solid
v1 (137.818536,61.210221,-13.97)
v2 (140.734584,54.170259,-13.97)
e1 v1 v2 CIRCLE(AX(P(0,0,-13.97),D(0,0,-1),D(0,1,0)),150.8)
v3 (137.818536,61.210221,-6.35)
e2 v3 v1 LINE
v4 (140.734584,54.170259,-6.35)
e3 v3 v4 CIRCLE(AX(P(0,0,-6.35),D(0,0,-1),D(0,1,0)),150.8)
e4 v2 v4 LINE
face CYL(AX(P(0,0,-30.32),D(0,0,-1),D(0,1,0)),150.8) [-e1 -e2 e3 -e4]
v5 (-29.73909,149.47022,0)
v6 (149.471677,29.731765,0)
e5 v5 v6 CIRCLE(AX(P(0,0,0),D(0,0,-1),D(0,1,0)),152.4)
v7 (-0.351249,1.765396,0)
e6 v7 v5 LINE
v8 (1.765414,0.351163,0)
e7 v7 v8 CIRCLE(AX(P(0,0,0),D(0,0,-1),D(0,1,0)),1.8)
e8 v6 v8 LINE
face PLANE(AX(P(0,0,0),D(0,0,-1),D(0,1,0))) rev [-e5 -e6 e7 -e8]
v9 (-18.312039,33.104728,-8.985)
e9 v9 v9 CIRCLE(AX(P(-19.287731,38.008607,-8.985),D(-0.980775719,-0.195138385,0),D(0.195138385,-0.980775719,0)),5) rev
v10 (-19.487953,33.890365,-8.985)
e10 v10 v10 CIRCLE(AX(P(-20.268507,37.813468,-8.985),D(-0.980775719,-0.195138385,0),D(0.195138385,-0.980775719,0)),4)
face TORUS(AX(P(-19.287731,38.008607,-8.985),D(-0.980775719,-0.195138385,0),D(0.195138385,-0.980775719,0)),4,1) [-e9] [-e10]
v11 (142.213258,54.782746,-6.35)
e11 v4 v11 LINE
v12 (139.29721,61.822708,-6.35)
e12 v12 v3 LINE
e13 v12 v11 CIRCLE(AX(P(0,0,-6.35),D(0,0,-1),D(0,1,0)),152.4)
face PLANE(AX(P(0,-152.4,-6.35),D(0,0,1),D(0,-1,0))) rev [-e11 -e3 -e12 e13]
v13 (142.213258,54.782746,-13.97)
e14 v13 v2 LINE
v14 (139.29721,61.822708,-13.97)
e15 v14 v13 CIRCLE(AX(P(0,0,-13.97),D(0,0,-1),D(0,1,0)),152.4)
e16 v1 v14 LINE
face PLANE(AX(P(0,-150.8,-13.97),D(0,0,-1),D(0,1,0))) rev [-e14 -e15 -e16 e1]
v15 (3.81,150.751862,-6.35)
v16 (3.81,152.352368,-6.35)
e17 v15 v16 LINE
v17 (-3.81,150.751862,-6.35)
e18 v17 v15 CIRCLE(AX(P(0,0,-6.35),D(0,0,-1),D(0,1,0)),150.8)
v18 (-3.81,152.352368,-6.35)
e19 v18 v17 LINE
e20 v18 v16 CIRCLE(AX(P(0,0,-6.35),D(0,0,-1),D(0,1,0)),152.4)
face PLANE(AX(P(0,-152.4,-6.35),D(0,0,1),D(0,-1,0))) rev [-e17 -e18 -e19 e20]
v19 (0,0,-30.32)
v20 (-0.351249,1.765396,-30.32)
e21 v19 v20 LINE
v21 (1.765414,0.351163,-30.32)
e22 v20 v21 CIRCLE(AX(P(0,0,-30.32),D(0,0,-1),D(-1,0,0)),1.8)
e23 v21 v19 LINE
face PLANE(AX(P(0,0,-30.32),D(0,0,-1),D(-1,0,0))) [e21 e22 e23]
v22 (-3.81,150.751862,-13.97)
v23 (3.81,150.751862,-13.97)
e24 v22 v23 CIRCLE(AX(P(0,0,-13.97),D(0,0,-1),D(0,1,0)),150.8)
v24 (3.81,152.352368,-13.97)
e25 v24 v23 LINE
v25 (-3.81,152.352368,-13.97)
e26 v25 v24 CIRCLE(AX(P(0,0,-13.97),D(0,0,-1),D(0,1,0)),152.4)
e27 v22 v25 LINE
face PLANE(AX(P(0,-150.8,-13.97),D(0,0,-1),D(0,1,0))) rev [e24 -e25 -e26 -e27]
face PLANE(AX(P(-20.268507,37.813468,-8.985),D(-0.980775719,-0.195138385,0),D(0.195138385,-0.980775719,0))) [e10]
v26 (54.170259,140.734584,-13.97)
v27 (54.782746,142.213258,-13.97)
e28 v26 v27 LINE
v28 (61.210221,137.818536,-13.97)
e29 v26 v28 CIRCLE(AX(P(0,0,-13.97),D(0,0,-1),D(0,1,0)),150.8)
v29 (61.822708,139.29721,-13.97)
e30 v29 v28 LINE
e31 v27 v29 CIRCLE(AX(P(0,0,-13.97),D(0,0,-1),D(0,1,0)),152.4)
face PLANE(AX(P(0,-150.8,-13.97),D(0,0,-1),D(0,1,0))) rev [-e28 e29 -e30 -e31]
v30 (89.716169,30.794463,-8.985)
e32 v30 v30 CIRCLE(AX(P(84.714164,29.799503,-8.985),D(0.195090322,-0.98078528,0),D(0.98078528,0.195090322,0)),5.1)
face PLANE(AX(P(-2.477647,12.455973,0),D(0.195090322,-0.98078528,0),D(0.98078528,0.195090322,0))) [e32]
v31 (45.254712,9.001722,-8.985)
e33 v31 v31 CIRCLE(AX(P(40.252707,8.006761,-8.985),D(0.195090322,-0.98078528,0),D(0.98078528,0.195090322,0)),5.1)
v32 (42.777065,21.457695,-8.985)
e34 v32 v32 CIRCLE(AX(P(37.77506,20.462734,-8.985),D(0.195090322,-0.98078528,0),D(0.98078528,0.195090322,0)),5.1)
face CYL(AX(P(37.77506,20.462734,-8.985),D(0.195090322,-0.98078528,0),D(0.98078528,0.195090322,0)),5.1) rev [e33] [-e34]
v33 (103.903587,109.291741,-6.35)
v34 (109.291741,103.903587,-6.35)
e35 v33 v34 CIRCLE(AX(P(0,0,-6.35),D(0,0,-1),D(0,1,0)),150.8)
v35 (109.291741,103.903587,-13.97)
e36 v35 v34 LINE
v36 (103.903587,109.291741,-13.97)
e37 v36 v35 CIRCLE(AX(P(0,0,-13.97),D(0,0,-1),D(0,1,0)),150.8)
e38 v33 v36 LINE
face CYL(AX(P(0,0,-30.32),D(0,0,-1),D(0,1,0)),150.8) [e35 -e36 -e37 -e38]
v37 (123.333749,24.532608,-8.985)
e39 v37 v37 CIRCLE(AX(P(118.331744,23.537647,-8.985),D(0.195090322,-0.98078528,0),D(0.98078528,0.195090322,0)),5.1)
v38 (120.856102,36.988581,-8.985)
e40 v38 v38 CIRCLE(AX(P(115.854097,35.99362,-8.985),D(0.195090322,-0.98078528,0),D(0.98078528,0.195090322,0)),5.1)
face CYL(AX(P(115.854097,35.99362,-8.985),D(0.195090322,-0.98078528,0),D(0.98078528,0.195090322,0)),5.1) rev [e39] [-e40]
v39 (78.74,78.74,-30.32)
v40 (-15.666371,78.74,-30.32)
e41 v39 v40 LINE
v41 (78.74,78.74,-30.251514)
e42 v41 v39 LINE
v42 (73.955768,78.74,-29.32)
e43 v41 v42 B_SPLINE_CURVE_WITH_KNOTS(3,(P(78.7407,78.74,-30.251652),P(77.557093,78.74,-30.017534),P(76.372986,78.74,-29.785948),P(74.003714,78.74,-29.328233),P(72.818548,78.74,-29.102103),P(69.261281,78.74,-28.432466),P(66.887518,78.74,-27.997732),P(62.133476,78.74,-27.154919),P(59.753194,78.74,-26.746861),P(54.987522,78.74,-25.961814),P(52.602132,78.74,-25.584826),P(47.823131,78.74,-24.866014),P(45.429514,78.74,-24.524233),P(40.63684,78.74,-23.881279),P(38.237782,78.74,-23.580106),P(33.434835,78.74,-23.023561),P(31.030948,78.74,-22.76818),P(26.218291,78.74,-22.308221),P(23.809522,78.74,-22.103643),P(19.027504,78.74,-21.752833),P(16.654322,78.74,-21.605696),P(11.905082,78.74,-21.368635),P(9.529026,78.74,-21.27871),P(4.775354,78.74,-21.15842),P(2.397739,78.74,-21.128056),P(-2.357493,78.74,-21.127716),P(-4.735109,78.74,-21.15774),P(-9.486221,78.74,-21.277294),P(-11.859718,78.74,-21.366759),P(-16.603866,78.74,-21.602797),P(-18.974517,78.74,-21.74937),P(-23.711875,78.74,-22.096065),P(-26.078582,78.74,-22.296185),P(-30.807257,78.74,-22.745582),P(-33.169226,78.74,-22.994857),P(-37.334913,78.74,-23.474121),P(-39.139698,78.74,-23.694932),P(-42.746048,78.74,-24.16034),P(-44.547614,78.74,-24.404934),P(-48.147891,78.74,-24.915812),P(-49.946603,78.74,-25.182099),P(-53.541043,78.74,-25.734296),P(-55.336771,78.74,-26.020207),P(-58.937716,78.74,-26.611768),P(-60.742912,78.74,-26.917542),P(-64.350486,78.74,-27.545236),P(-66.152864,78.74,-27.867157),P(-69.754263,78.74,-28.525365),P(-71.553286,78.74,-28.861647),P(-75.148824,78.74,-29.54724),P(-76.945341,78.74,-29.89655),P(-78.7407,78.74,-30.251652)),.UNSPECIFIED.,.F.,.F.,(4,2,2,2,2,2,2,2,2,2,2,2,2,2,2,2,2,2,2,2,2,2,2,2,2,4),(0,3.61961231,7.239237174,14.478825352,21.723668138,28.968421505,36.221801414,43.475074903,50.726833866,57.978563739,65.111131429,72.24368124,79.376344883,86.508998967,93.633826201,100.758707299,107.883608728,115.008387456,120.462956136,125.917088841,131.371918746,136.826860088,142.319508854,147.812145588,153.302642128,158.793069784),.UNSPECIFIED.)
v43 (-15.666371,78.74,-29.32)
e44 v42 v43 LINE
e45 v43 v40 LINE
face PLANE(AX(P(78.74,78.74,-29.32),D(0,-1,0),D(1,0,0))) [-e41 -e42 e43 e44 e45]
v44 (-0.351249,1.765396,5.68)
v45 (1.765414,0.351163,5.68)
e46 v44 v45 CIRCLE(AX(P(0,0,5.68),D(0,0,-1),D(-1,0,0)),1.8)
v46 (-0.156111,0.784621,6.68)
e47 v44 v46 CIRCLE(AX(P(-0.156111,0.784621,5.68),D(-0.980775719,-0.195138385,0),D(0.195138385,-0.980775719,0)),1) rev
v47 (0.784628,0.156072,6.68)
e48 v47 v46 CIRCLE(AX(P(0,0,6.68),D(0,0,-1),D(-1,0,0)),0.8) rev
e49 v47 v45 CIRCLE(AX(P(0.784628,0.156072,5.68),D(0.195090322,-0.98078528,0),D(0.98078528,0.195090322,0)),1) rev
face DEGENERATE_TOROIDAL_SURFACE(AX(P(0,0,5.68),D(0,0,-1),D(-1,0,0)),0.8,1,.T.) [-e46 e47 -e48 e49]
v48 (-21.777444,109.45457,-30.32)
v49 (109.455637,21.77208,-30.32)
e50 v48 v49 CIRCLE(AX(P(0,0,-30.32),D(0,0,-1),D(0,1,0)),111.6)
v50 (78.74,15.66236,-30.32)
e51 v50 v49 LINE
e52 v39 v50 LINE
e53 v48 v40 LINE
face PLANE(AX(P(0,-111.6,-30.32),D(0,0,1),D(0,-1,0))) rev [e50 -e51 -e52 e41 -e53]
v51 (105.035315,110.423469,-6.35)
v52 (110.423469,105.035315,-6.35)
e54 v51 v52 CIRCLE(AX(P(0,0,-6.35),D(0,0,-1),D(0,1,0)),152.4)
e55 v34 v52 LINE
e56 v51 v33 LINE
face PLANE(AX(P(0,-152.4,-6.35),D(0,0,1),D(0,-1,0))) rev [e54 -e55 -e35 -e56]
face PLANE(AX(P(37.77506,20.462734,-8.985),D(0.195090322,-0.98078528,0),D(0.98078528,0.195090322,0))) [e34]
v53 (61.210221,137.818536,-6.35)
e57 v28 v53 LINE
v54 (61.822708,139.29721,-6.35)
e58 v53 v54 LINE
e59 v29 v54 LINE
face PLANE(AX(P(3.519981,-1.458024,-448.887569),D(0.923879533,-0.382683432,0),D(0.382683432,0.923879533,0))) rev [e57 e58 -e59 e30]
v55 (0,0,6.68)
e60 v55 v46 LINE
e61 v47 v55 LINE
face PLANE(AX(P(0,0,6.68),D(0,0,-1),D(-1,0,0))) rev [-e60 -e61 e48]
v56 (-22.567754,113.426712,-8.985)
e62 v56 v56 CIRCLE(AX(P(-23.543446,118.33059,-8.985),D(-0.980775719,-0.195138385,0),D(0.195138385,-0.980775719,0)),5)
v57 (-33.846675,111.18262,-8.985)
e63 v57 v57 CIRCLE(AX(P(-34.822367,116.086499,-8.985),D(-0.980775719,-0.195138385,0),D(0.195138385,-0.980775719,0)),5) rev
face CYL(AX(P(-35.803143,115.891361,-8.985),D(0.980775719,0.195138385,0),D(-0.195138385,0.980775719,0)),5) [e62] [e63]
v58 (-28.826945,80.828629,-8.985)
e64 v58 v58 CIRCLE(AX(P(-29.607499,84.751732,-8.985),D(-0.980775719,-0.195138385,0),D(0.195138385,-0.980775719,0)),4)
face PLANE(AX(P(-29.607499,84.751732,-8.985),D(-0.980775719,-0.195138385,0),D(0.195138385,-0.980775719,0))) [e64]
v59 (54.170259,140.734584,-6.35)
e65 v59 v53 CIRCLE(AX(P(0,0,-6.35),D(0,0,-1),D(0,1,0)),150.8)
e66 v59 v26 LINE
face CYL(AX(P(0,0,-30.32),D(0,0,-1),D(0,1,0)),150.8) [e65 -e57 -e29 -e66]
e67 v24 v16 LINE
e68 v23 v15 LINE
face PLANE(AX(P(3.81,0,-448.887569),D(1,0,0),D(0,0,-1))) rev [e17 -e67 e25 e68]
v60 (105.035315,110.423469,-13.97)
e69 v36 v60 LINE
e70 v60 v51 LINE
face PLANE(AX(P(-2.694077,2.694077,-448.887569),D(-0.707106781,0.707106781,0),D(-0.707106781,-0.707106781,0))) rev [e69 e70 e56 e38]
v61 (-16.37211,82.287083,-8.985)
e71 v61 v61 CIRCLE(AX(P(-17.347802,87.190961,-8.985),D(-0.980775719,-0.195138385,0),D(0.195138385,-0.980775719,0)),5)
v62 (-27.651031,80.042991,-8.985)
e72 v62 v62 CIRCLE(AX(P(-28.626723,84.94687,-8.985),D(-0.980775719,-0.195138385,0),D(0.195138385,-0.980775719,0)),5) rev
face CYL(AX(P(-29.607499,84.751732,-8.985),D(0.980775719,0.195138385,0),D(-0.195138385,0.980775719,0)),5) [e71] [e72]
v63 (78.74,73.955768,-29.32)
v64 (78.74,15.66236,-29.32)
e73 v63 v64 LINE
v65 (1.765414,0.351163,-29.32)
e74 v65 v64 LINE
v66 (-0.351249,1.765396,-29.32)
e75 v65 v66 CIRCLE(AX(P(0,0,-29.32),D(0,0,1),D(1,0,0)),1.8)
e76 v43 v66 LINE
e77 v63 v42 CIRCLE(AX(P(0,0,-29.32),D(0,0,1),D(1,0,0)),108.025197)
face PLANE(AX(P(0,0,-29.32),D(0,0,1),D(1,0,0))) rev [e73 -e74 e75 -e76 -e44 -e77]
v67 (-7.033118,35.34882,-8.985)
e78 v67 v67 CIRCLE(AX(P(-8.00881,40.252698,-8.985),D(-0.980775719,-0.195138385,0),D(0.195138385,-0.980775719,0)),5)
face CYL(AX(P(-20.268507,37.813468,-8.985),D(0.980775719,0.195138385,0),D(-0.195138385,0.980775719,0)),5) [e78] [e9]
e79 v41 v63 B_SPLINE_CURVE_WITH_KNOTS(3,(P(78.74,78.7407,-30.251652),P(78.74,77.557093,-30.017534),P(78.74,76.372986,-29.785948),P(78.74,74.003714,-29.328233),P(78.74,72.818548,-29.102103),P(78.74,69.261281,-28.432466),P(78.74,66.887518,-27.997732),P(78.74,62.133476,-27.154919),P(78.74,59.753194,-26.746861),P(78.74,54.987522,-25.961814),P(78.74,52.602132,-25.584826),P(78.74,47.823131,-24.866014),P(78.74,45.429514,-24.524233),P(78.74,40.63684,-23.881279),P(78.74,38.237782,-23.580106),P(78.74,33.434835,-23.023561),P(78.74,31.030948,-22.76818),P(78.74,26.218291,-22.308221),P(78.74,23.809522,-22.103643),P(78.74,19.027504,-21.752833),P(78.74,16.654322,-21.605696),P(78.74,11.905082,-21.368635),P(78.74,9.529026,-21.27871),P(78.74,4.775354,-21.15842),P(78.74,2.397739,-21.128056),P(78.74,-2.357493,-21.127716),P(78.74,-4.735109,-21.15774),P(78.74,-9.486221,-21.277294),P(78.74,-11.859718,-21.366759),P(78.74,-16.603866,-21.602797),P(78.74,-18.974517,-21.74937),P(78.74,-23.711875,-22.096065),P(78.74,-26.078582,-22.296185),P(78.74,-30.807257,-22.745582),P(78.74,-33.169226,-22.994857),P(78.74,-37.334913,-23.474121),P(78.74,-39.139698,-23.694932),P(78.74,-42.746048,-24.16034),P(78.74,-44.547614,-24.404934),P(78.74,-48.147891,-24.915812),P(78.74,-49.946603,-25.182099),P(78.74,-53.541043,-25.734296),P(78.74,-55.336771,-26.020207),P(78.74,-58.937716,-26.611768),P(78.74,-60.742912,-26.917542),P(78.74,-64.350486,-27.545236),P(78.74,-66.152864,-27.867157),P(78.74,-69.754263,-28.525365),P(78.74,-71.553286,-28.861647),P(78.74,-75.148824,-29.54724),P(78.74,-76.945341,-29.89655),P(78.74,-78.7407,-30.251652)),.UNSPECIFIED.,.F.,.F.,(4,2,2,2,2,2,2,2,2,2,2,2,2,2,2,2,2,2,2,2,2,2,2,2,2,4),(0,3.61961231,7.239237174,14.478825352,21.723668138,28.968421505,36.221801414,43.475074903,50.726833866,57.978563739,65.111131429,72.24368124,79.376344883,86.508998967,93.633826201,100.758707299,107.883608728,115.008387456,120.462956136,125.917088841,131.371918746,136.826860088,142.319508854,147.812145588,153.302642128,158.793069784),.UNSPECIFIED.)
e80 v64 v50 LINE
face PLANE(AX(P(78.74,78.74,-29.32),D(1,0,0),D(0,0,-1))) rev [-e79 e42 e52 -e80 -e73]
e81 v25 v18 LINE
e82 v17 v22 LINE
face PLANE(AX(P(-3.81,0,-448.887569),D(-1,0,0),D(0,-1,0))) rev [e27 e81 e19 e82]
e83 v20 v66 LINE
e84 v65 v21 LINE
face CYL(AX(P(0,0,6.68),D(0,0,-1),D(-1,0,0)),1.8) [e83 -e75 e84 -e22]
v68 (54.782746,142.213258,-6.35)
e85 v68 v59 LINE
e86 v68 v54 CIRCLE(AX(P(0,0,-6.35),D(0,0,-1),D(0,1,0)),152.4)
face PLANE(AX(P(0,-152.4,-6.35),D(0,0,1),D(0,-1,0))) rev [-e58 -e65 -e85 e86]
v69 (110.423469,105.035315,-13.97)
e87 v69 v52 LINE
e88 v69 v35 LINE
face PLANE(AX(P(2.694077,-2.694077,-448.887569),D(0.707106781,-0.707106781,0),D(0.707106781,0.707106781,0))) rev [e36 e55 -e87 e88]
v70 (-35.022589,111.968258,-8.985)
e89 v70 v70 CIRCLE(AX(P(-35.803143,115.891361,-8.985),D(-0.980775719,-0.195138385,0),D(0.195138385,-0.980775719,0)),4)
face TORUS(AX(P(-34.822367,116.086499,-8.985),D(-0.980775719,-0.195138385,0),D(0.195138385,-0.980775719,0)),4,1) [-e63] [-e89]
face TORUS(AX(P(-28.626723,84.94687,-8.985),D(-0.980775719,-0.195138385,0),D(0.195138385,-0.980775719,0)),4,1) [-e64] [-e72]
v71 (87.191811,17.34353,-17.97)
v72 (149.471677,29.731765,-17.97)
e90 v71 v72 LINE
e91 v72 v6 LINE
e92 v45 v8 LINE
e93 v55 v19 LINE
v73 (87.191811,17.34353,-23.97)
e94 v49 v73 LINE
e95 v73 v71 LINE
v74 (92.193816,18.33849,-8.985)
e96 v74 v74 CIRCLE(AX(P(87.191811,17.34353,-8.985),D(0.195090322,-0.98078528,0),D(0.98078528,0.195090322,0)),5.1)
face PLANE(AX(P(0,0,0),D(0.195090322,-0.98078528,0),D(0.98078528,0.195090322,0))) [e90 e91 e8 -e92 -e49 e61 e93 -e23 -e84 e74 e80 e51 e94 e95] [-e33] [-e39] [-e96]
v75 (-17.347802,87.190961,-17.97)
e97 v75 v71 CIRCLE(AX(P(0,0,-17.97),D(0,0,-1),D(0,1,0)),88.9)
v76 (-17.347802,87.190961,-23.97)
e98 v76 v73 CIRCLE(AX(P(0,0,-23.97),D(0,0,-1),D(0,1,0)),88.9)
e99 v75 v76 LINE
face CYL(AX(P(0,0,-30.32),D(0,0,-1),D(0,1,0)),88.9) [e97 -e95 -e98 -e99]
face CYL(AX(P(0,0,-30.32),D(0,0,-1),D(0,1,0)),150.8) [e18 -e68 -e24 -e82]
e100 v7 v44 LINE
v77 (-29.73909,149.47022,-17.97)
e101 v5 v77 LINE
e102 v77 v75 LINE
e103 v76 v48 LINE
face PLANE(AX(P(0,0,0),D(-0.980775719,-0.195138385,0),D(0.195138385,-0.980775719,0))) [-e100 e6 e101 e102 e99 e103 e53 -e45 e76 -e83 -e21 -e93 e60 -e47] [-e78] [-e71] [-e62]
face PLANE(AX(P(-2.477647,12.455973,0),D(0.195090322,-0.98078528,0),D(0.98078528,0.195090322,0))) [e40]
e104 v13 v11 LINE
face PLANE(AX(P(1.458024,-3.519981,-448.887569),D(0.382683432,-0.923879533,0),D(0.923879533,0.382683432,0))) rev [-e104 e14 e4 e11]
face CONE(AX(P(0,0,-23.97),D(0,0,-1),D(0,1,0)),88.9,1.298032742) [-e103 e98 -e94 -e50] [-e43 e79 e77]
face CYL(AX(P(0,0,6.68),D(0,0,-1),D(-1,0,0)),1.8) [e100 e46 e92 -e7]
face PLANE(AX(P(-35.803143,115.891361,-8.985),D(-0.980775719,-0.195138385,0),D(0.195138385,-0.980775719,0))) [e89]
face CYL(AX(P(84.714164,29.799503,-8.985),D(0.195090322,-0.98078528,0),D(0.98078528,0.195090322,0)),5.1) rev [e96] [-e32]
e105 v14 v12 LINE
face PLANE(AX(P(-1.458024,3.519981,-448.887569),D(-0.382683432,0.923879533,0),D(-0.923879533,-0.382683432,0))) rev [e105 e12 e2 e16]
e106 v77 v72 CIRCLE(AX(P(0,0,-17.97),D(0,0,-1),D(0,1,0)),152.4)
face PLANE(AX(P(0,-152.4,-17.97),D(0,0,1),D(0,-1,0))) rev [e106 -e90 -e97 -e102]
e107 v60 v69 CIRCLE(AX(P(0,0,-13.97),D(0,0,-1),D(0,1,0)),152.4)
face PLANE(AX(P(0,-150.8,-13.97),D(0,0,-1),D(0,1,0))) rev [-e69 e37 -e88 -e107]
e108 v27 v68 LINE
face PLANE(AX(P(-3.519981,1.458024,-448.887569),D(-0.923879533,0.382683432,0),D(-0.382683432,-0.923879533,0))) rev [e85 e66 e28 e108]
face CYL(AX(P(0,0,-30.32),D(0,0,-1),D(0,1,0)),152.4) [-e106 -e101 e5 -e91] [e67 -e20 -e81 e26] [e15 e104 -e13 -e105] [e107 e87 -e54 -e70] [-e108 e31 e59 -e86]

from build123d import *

# Parameters (mm, degrees)
BOSS_EXTRUDE1_START = -13.97
BOSS_EXTRUDE1_DEPTH = 7.62
SKETCH3_W           = 157.48
SKETCH3_H           = 157.48
CUT_EXTRUDE1_DEPTH  = 1
SKETCH3_3_R         = 1.8
BOSS_EXTRUDE2_DEPTH = 37
FILLET1_R           = 1
SKETCH11_R          = 5.1
CUT_EXTRUDE2_DEPTH  = 12.7
SKETCH10_R          = 5
BOSS_EXTRUDE3_DEPTH = 12.5
FILLET2_R           = 1


# Read off the part's stored shape, not the designer's step: Boss-Extrude1
with BuildPart() as part:
    # Sketch1 → Revolve1 (revolve)
    with BuildSketch(Plane.YZ, mode=Mode.PRIVATE) as revolve1_sk:
        Polygon((0, 0), (-152.4, 0), (-152.4, -6.35), (-150.8, -6.35), (-150.8, -13.97), (-152.4, -13.97), (-152.4, -17.97), (-88.9, -17.97), (-88.9, -23.97), (-111.6, -30.32), (0, -30.32), align=None)
    revolve(revolve1_sk.sketch.rotate(Axis((0, 0, -30.32), (0, 0, 1)), 180), axis=Axis((0, 0, -30.32), (0, 0, 1)))

    # Boss-Extrude1 outline → Boss-Extrude1 (add)
    with BuildSketch(Plane.XY.offset(BOSS_EXTRUDE1_START)):
        with BuildLine():
            Line((150.751862012, 3.81), (152.352367556, 3.81))
            ThreePointArc((152.352367556, 3.81), (149.471676733, 29.731765076), (142.213257992, 54.782745927))
            Line((142.213257992, 54.782745927), (140.734583678, 54.170258971))
            ThreePointArc((140.734583678, 54.170258971), (147.902420285, 29.41962056), (150.751862012, 3.81))
        make_face()
        with BuildLine():
            ThreePointArc((142.213257992, -54.782745926), (149.471676733, -29.731765075), (152.352367556, -3.81))
            Line((152.352367556, -3.81), (150.751862012, -3.81))
            ThreePointArc((150.751862012, -3.81), (147.902420285, -29.41962056), (140.734583678, -54.170258971))
            Line((140.734583678, -54.170258971), (142.213257992, -54.782745926))
        make_face()
        with BuildLine():
            Line((137.818535923, 61.210221009), (139.297210238, 61.822707964))
            ThreePointArc((139.297210238, 61.822707964), (126.715968915, 84.668903512), (110.423469065, 105.035315393))
            Line((110.423469065, 105.035315393), (109.291740741, 103.903587069))
            ThreePointArc((109.291740741, 103.903587069), (125.385617535, 83.77999114), (137.818535923, 61.210221009))
        make_face()
        with BuildLine():
            ThreePointArc((110.423469065, -105.035315392), (126.715968915, -84.668903512), (139.297210238, -61.822707964))
            Line((139.297210238, -61.822707964), (137.818535923, -61.210221009))
            ThreePointArc((137.818535923, -61.210221009), (125.385617535, -83.77999114), (109.291740741, -103.903587069))
            Line((109.291740741, -103.903587069), (110.423469065, -105.035315392))
        make_face()
        with BuildLine():
            Line((103.903587069, 109.291740741), (105.035315393, 110.423469065))
            ThreePointArc((105.035315393, 110.423469065), (84.668903512, 126.715968915), (61.822707964, 139.297210238))
            Line((61.822707964, 139.297210238), (61.210221009, 137.818535923))
            ThreePointArc((61.210221009, 137.818535923), (83.77999114, 125.385617535), (103.903587069, 109.291740741))
        make_face()
        with BuildLine():
            ThreePointArc((61.822707964, -139.297210238), (84.668903512, -126.715968915), (105.035315393, -110.423469065))
            Line((105.035315393, -110.423469065), (103.903587069, -109.291740741))
            ThreePointArc((103.903587069, -109.291740741), (83.77999114, -125.385617535), (61.210221009, -137.818535923))
            Line((61.210221009, -137.818535923), (61.822707964, -139.297210238))
        make_face()
        with BuildLine():
            Line((54.170258971, 140.734583678), (54.782745927, 142.213257992))
            ThreePointArc((54.782745927, 142.213257992), (29.731765076, 149.471676733), (3.81, 152.352367556))
            Line((3.81, 152.352367556), (3.81, 150.751862012))
            ThreePointArc((3.81, 150.751862012), (29.41962056, 147.902420285), (54.170258971, 140.734583678))
        make_face()
        with BuildLine():
            ThreePointArc((3.81, -152.352367556), (29.731765076, -149.471676733), (54.782745927, -142.213257992))
            Line((54.782745927, -142.213257992), (54.170258971, -140.734583678))
            ThreePointArc((54.170258971, -140.734583678), (29.41962056, -147.902420285), (3.81, -150.751862012))
            Line((3.81, -150.751862012), (3.81, -152.352367556))
        make_face()
        with BuildLine():
            Line((-3.81, 150.751862012), (-3.81, 152.352367556))
            ThreePointArc((-3.81, 152.352367556), (-29.731765076, 149.471676733), (-54.782745927, 142.213257992))
            Line((-54.782745927, 142.213257992), (-54.170258971, 140.734583678))
            ThreePointArc((-54.170258971, 140.734583678), (-29.41962056, 147.902420285), (-3.81, 150.751862012))
        make_face()
        with BuildLine():
            ThreePointArc((-54.782745926, -142.213257992), (-29.731765075, -149.471676733), (-3.81, -152.352367556))
            Line((-3.81, -152.352367556), (-3.81, -150.751862012))
            ThreePointArc((-3.81, -150.751862012), (-29.41962056, -147.902420285), (-54.170258971, -140.734583678))
            Line((-54.170258971, -140.734583678), (-54.782745926, -142.213257992))
        make_face()
        with BuildLine():
            Line((-61.210221009, 137.818535923), (-61.822707964, 139.297210238))
            ThreePointArc((-61.822707964, 139.297210238), (-84.668903512, 126.715968915), (-105.035315393, 110.423469065))
            Line((-105.035315393, 110.423469065), (-103.903587069, 109.291740741))
            ThreePointArc((-103.903587069, 109.291740741), (-83.77999114, 125.385617535), (-61.210221009, 137.818535923))
        make_face()
        with BuildLine():
            ThreePointArc((-105.035315392, -110.423469065), (-84.668903512, -126.715968915), (-61.822707964, -139.297210238))
            Line((-61.822707964, -139.297210238), (-61.210221009, -137.818535923))
            ThreePointArc((-61.210221009, -137.818535923), (-83.77999114, -125.385617535), (-103.903587069, -109.291740741))
            Line((-103.903587069, -109.291740741), (-105.035315392, -110.423469065))
        make_face()
        with BuildLine():
            Line((-109.291740741, 103.903587069), (-110.423469065, 105.035315393))
            ThreePointArc((-110.423469065, 105.035315393), (-126.715968915, 84.668903512), (-139.297210238, 61.822707964))
            Line((-139.297210238, 61.822707964), (-137.818535923, 61.210221009))
            ThreePointArc((-137.818535923, 61.210221009), (-125.385617535, 83.77999114), (-109.291740741, 103.903587069))
        make_face()
        with BuildLine():
            ThreePointArc((-139.297210238, -61.822707964), (-126.715968915, -84.668903512), (-110.423469065, -105.035315393))
            Line((-110.423469065, -105.035315393), (-109.291740741, -103.903587069))
            ThreePointArc((-109.291740741, -103.903587069), (-125.385617535, -83.77999114), (-137.818535923, -61.210221009))
            Line((-137.818535923, -61.210221009), (-139.297210238, -61.822707964))
        make_face()
        with BuildLine():
            Line((-140.734583678, 54.170258971), (-142.213257992, 54.782745926))
            ThreePointArc((-142.213257992, 54.782745926), (-149.471676733, 29.731765075), (-152.352367556, 3.81))
            Line((-152.352367556, 3.81), (-150.751862012, 3.81))
            ThreePointArc((-150.751862012, 3.81), (-147.902420285, 29.41962056), (-140.734583678, 54.170258971))
        make_face()
        with BuildLine():
            ThreePointArc((-152.352367556, -3.81), (-149.471676733, -29.731765076), (-142.213257992, -54.782745927))
            Line((-142.213257992, -54.782745927), (-140.734583678, -54.170258971))
            ThreePointArc((-140.734583678, -54.170258971), (-147.902420285, -29.41962056), (-150.751862012, -3.81))
            Line((-150.751862012, -3.81), (-152.352367556, -3.81))
        make_face()
    extrude(amount=BOSS_EXTRUDE1_DEPTH)

    # Sketch3 → Cut-Extrude1 (cut)
    with BuildSketch(Plane(origin=(0, 0, -30.32), x_dir=(1, 0, 0), z_dir=(0, 0, -1))):
        Rectangle(SKETCH3_W, SKETCH3_H)
    extrude(amount=-CUT_EXTRUDE1_DEPTH, mode=Mode.SUBTRACT)

    # Sketch3<3> → Boss-Extrude2 (add)
    with BuildSketch(Plane(origin=(0, 0, -30.32), x_dir=(1, 0, 0), z_dir=(0, 0, -1))):
        with Locations(Location((0, 0, 0), (0, 0, 180))):
            Circle(SKETCH3_3_R)
    extrude(amount=-BOSS_EXTRUDE2_DEPTH)

    # Fillet1
    fillet1_edges = [part.edges().sort_by_distance(p)[0] for p in [
        (1.8, 0, 6.68),
    ]]
    fillet(fillet1_edges, radius=FILLET1_R)

    # Split2
    split(bisect_by=Plane(origin=(0, 0, 0), x_dir=(-0.9807852804032318, -0.19509032201612173, 0), z_dir=(0.19509032201612173, -0.9807852804032318, 0)), keep=Keep.BOTTOM)

    # Split3
    split(bisect_by=Plane(origin=(0, 0, 0), x_dir=(0.1951383847238072, -0.9807757189120169, 0), z_dir=(-0.9807757189120169, -0.1951383847238072, 0)), keep=Keep.BOTTOM)

    # Sketch11 → Cut-Extrude2 (cut)
    with BuildSketch(Plane(origin=(0, 0, 0), x_dir=(0.9807852804032318, 0.19509032201612175, 0), z_dir=(0.19509032201612175, -0.9807852804032318, 0))):
        with Locations((88.9, -8.985)):
            Circle(SKETCH11_R)
        with Locations((120.65, -8.985)):
            Circle(SKETCH11_R)
        with Locations((41.041303899, -8.985)):
            Circle(SKETCH11_R)
    extrude(amount=-CUT_EXTRUDE2_DEPTH, mode=Mode.SUBTRACT)

    # Sketch10 → Boss-Extrude3 (add)
    with BuildSketch(Plane(origin=(0, 0, 0), x_dir=(0.19513838472380637, -0.980775718912017, 0), z_dir=(-0.980775718912017, -0.19513838472380637, 0))):
        with Locations((-120.65, -8.985)):
            Circle(SKETCH10_R)
        with Locations((-88.9, -8.985)):
            Circle(SKETCH10_R)
        with Locations((-41.041695232, -8.985)):
            Circle(SKETCH10_R)
    extrude(amount=BOSS_EXTRUDE3_DEPTH)

    # Fillet2
    fillet2_edges = [part.edges().sort_by_distance(p)[0] for p in [
        (-36.778834527, 120.795239272, -8.985),
        (-30.583190812, 89.655610197, -8.985),
        (-21.244198524, 42.717346933, -8.985),
    ]]
    fillet(fillet2_edges, radius=FILLET2_R)


solid = part.part
